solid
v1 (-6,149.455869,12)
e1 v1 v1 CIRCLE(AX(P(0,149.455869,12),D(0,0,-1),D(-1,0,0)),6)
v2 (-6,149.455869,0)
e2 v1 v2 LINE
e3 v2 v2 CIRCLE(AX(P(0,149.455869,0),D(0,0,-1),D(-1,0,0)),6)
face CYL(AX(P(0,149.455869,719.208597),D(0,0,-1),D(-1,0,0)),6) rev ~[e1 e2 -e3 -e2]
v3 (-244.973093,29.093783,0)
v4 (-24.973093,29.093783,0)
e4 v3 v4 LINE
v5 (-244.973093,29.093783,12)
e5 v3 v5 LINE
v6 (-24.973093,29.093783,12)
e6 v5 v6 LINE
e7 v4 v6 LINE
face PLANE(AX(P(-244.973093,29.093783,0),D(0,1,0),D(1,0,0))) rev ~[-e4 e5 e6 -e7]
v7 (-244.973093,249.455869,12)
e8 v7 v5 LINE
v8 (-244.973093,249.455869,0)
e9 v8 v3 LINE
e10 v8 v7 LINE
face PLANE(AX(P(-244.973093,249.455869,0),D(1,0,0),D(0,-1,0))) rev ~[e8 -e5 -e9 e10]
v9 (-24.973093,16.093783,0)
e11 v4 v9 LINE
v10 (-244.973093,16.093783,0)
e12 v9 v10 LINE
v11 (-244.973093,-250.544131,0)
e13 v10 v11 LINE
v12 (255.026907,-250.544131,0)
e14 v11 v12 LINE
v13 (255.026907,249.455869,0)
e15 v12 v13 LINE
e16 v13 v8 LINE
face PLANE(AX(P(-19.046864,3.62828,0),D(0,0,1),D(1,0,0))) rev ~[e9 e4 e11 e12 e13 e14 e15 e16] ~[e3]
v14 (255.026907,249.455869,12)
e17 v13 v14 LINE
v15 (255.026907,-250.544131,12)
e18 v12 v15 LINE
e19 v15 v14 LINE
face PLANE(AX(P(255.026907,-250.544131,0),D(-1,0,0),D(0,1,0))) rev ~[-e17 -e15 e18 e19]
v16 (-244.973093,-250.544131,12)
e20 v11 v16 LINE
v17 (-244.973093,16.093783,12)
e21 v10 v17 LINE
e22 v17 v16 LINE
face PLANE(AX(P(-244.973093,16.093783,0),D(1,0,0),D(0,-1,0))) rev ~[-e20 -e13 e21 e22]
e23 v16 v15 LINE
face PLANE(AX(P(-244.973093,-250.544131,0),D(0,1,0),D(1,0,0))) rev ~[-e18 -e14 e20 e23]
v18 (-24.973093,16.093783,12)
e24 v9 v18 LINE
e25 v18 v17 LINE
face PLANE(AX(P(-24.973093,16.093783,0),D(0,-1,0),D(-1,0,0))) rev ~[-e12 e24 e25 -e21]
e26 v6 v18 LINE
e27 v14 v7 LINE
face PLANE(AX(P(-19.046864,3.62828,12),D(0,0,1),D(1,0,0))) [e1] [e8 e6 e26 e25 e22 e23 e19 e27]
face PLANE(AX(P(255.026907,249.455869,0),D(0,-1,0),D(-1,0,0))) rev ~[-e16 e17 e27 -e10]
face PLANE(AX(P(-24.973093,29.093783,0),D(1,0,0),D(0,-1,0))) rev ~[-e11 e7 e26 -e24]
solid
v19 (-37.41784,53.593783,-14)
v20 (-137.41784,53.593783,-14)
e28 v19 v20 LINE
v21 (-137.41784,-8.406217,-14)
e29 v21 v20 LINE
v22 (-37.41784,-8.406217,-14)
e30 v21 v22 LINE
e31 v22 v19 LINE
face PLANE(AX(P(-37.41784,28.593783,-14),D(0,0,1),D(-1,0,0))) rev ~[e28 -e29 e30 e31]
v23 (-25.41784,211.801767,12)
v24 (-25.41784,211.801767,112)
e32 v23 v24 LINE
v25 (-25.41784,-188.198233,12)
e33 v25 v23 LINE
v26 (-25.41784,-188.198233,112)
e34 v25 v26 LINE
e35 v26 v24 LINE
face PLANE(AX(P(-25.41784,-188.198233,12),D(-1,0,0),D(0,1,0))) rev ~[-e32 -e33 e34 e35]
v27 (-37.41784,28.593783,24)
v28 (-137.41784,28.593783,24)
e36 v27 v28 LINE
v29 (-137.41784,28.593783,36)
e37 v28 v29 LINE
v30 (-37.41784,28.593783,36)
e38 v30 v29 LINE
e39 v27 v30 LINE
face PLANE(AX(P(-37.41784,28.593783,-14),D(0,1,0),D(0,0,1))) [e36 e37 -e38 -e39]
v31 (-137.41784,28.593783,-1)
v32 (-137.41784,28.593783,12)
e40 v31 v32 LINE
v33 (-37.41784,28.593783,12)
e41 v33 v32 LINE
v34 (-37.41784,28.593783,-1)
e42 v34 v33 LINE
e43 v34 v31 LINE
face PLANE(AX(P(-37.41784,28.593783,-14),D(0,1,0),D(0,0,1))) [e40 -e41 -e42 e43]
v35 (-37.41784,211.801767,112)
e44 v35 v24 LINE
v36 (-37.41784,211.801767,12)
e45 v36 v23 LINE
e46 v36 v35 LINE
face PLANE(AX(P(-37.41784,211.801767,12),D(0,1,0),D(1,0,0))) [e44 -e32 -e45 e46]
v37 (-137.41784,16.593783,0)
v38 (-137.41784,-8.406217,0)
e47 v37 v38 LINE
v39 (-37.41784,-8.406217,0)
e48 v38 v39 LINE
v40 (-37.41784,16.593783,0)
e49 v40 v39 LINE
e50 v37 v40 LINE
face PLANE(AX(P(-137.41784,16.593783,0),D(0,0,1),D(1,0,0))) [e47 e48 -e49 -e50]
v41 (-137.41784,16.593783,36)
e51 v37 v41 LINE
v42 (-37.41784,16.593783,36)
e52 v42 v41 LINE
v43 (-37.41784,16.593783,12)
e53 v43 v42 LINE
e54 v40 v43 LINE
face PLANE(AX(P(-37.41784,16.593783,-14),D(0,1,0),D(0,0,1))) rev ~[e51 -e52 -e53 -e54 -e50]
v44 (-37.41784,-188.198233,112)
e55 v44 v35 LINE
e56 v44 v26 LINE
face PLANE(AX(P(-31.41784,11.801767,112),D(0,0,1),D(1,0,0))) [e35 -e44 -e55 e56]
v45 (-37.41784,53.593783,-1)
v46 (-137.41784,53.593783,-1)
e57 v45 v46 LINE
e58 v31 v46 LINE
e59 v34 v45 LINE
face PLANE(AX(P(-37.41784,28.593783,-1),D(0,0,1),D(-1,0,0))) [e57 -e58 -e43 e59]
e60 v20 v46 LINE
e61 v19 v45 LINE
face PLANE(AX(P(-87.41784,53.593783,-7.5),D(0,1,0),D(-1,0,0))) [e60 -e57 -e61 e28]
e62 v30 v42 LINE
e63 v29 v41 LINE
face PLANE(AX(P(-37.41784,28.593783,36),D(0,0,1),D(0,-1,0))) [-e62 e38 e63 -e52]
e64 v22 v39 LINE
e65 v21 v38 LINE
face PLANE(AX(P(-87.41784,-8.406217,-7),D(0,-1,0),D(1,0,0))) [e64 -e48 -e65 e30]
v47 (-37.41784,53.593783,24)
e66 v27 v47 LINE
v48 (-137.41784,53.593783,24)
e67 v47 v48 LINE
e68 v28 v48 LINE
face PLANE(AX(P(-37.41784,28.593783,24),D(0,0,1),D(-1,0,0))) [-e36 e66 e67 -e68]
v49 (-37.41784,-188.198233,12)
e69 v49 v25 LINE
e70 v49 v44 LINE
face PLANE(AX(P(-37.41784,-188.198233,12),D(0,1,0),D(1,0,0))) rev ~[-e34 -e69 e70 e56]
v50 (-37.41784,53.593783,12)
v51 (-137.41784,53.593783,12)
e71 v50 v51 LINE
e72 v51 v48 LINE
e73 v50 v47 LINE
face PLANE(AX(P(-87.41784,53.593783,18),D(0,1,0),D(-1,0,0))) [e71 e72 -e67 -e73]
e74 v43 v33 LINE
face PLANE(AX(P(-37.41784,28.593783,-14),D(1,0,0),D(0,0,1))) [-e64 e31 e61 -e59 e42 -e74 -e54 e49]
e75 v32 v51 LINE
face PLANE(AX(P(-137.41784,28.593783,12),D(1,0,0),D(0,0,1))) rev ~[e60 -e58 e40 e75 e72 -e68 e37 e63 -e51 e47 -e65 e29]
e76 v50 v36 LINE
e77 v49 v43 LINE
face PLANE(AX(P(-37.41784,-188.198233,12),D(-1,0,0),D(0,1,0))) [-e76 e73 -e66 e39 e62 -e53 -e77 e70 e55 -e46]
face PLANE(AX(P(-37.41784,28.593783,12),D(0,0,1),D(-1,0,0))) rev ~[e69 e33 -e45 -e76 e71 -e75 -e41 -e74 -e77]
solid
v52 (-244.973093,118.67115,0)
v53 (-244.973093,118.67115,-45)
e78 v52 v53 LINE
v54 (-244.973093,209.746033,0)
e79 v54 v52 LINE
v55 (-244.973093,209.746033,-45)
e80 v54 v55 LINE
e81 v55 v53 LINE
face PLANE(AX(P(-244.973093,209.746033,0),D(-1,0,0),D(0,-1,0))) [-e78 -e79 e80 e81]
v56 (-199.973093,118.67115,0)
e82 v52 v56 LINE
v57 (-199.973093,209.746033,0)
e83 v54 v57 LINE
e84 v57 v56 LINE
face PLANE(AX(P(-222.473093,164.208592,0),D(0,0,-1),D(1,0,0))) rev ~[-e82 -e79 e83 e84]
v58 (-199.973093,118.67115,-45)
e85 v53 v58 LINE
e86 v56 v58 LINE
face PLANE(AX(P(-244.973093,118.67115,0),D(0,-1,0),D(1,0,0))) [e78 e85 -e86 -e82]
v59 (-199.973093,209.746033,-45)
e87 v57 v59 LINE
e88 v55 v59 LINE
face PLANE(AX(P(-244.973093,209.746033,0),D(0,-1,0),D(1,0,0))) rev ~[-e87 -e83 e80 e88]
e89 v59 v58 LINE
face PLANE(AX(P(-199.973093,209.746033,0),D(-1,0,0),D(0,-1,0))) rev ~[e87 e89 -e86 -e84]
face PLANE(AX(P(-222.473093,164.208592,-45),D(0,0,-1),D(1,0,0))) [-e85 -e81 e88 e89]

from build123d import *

# Parameters (mm, degrees)
F1_DEPTH  = 12
F3_D      = 12
F4_W      = 12
F4_H      = 400
F5_DEPTH  = 100
F6_W      = 12
F6_H      = 50
F7_DEPTH  = 100
F8_W      = 100
F8_H      = 14
F9_DEPTH  = 25
F10_W     = 100
F10_H     = 13
F11_DEPTH = 25
F12_W     = 100
F12_H     = 12
F13_DEPTH = 25
F14_W     = 45
F14_H     = 91.0748828953
F15_DEPTH = 45


with BuildPart() as f1:
    # F0 (on Top) → F1 (new body)
    with BuildSketch(Plane.XY):
        Polygon((255.0269067287, 249.4558691978), (-244.9730932713, 249.4558691978), (-244.9730932713, 29.0937830806), (-24.9730932713, 29.0937830806), (-24.9730932713, 16.0937830806), (-244.9730932713, 16.0937830806), (-244.9730932713, -250.5441308022), (255.0269067287, -250.5441308022), align=None)
    extrude(amount=F1_DEPTH)

    # F3 (through all)
    with Locations(Plane.XY.offset(12)):
        with Locations((0, 149.4558691978)):
            Hole(F3_D / 2)


with BuildPart() as f5:
    # F4 (on face) → F5 (new body)
    with BuildSketch(Plane.XY.offset(12)):
        with Locations((-31.4178401083, 11.8017673492)):
            Rectangle(F4_W, F4_H)
    extrude(amount=F5_DEPTH)

    # F6 (on face) → F7 (join)
    with BuildSketch(Plane(origin=(-37.4178401083, 0, 0), x_dir=(0, -1, 0), z_dir=(-1, 0, 0))):
        with Locations((-22.5937830806, 11)):
            Rectangle(F6_W, F6_H)
    extrude(amount=F7_DEPTH)

    # F8 (on face) → F9 (join)
    with BuildSketch(Plane.XZ.offset(-16.5937830806)):
        with Locations((-87.4178401083, -7)):
            Rectangle(F8_W, F8_H)
    extrude(amount=F9_DEPTH)

    # F10 (on face) → F11 (join)
    with BuildSketch(Plane(origin=(0, 28.5937830806, 0), x_dir=(-1, 0, 0), z_dir=(0, 1, 0))):
        with Locations((87.4178401083, -7.5)):
            Rectangle(F10_W, F10_H)
    extrude(amount=F11_DEPTH)

    # F12 (on face) → F13 (join)
    with BuildSketch(Plane(origin=(0, 28.5937830806, 0), x_dir=(-1, 0, 0), z_dir=(0, 1, 0))):
        with Locations((87.4178401083, 18)):
            Rectangle(F12_W, F12_H)
    extrude(amount=F13_DEPTH)


with BuildPart() as f15:
    # F14 (on face) → F15 (new body)
    with BuildSketch(Plane(origin=(0, 0, 0), x_dir=(1, 0, 0), z_dir=(0, 0, -1))):
        with Locations((-222.4730932713, -164.2085915056)):
            Rectangle(F14_W, F14_H)
    extrude(amount=F15_DEPTH)


solid = Compound([f1.part, f5.part, f15.part])
